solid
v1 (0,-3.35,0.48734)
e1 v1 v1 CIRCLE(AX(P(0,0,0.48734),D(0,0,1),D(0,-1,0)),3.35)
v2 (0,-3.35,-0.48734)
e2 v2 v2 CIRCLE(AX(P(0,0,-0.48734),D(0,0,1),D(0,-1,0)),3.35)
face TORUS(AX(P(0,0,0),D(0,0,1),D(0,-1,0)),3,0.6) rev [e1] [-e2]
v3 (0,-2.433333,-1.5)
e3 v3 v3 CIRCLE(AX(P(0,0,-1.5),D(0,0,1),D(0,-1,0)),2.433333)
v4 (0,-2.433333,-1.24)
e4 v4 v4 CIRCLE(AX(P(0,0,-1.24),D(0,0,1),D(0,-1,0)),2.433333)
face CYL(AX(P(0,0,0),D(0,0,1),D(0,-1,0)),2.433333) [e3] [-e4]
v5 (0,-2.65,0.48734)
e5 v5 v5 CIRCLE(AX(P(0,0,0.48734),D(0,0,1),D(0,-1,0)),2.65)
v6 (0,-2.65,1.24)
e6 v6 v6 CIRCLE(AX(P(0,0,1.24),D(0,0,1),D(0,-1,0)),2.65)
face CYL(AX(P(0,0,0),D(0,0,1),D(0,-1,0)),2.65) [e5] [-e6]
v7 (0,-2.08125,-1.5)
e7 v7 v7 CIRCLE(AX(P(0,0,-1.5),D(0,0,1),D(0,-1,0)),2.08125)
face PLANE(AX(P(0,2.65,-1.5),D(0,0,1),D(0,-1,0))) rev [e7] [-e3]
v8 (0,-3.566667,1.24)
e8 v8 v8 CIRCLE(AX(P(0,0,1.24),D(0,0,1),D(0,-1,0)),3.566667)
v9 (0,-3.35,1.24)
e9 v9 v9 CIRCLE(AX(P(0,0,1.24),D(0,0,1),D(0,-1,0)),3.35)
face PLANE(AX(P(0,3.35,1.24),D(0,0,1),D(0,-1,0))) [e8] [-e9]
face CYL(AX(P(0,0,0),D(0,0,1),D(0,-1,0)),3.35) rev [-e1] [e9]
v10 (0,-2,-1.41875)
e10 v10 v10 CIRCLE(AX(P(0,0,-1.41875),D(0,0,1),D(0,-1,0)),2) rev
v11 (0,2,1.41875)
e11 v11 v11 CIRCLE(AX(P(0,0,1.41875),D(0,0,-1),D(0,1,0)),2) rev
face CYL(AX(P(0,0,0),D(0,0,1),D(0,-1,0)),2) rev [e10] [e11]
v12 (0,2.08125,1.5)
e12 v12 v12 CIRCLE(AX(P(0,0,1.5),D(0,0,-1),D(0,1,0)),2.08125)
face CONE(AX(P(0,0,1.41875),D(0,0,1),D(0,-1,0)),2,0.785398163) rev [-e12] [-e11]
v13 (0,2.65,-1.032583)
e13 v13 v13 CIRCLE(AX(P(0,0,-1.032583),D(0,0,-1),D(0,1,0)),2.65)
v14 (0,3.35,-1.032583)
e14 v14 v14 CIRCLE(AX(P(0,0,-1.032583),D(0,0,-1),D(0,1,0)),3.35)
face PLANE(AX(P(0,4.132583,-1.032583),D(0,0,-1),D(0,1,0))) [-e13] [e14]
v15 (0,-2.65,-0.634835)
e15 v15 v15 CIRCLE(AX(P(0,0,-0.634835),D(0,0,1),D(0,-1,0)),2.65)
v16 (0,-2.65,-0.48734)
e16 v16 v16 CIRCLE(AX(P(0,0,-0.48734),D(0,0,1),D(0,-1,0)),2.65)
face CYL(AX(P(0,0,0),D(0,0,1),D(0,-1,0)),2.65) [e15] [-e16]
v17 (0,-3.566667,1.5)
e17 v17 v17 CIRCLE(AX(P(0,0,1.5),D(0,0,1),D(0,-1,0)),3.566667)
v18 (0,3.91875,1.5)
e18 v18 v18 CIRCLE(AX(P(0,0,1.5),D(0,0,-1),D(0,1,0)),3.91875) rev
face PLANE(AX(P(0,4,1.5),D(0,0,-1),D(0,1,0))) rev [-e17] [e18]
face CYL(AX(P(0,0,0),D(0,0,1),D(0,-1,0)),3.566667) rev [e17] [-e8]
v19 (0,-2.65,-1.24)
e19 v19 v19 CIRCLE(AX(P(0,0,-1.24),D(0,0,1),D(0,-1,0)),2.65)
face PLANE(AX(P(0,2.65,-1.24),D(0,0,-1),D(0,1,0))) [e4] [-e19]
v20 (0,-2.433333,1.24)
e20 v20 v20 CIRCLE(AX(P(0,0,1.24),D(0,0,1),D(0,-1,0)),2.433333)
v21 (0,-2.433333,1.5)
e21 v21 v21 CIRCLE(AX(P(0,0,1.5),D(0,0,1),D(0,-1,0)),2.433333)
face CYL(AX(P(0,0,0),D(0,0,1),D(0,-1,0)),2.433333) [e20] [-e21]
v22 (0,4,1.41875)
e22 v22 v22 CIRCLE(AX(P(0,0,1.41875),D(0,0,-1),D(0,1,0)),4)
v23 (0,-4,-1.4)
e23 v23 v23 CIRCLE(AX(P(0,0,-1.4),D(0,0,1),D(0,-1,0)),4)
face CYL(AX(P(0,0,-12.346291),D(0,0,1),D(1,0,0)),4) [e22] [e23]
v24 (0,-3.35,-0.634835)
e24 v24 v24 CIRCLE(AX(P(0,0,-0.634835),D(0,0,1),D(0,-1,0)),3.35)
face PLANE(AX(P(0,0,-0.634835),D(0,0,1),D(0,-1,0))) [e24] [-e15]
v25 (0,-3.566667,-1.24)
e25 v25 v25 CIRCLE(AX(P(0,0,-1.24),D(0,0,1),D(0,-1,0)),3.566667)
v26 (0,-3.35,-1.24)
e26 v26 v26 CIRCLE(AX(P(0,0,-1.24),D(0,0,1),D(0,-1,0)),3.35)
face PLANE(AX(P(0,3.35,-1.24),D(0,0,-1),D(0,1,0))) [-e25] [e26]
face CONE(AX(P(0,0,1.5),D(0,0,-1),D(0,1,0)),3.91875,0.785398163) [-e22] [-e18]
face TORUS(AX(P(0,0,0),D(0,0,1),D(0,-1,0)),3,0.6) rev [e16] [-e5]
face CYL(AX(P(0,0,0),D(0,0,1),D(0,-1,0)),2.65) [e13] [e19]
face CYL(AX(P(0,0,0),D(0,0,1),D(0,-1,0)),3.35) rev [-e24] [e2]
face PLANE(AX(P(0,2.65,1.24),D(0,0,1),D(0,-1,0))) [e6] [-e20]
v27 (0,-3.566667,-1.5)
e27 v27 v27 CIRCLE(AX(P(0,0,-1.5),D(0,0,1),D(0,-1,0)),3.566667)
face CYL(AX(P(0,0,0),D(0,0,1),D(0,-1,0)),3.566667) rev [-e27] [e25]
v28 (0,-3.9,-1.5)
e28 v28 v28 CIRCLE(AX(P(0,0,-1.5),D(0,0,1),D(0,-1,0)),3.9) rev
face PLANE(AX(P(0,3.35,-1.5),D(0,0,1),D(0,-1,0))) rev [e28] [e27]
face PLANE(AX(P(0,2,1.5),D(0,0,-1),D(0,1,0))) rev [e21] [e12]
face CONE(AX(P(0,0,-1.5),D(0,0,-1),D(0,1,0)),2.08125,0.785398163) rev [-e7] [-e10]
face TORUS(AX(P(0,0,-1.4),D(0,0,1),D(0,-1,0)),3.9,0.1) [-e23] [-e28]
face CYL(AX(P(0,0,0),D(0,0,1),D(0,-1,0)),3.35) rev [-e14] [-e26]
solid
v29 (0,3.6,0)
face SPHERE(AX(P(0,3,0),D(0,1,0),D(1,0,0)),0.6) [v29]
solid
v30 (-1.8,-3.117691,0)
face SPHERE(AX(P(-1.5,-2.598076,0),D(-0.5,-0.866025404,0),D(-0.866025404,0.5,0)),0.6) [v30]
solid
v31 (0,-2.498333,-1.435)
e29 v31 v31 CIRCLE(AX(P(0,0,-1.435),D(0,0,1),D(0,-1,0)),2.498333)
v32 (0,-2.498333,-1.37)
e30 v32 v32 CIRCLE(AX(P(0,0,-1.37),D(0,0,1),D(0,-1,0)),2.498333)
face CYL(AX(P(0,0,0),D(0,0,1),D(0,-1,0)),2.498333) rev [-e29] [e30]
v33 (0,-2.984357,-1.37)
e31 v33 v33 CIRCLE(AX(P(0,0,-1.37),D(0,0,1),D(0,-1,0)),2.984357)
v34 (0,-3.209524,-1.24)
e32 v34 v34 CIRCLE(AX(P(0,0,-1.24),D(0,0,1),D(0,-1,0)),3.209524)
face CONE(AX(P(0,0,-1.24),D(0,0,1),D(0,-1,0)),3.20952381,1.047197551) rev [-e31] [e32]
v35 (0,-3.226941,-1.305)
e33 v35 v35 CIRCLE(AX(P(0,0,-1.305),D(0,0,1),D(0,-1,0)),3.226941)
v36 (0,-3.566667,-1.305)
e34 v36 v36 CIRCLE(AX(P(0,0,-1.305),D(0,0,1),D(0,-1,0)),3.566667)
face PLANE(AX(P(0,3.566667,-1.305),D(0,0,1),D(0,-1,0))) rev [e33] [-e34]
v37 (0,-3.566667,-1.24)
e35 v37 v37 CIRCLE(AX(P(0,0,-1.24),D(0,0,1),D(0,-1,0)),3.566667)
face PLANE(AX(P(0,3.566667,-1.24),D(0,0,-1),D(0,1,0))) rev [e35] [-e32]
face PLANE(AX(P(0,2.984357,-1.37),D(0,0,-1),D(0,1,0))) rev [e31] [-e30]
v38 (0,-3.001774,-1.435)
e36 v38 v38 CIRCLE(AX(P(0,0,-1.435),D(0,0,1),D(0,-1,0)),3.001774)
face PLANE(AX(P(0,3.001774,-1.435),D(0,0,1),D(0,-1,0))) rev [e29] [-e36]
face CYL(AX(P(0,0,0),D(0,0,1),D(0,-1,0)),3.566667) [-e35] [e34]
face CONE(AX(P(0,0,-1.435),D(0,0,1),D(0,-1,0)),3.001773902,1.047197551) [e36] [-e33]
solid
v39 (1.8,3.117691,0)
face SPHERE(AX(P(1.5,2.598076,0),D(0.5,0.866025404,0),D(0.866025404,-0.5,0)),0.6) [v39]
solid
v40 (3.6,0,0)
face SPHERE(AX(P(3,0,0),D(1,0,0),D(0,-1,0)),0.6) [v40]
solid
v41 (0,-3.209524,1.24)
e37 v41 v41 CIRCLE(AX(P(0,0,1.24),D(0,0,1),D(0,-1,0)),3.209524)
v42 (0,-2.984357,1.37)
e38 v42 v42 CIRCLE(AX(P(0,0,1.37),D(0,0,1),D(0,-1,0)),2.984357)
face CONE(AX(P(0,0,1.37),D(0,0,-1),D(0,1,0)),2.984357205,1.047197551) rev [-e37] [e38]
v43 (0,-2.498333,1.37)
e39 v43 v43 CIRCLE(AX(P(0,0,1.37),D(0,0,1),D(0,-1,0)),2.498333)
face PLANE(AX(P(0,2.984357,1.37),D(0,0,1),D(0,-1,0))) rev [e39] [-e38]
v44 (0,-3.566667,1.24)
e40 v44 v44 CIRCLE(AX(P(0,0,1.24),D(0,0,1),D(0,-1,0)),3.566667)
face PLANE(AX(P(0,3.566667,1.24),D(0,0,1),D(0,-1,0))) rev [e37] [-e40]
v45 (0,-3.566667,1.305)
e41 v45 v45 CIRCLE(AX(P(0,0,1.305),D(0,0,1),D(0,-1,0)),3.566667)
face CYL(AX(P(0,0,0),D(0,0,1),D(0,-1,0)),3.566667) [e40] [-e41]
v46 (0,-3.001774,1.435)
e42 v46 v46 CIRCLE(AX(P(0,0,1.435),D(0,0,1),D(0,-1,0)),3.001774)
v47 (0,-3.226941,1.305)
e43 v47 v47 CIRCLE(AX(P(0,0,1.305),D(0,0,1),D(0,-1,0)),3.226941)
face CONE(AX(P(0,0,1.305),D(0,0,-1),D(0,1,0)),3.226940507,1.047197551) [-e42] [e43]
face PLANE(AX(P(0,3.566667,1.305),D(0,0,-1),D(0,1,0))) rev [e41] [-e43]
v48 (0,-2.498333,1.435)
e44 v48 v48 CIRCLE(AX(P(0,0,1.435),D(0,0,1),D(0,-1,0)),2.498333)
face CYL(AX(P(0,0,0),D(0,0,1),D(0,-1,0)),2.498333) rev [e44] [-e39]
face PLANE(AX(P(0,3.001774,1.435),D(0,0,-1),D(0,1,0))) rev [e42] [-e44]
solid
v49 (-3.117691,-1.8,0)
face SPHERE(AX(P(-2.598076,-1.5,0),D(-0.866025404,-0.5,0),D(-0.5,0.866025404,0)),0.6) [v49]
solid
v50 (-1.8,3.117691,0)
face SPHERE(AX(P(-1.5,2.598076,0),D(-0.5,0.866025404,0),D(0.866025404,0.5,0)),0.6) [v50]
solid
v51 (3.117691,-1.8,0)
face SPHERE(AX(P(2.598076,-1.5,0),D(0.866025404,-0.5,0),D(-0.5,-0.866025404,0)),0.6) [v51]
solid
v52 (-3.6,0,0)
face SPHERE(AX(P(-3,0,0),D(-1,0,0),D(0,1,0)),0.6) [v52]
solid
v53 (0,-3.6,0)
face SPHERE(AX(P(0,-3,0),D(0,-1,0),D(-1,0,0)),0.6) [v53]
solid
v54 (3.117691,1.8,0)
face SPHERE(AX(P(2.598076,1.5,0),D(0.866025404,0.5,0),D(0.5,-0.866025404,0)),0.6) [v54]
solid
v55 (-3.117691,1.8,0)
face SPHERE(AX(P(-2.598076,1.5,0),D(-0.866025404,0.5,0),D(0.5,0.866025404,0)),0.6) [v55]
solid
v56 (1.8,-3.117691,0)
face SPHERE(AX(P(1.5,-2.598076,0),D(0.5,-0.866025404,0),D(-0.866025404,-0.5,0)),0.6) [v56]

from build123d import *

# Parameters (mm, degrees)
FILLET1_SIZE            = 0.08125
FILLET2_SIZE            = 0.08125
CIRPATTERN3_COUNT       = 12
SKETCH8_W               = 0.26
SKETCH8_H               = 0.216666667
CUT_EXTRUDE1_DEPTH      = 8.163797875
CUT_EXTRUDE1_DEPTH_BACK = 8.163797875
SKETCH10_R              = 4.6
SKETCH10_R_2            = 4
BOSS_EXTRUDE1_START     = 0.397747564
SKETCH11_R              = 4
BOSS_EXTRUDE1_DEPTH     = 0.397747564
CUT_EXTRUDE2_DEPTH      = 7.046281526
CUT_EXTRUDE2_DEPTH_BACK = 7.046281526
SKETCH12_R              = 2
FILLET4_R               = 0.1


with BuildPart() as part:
    # Sketch2 → Revolve1 (revolve)
    with BuildSketch(Plane(origin=(0, 0, 0), x_dir=(0, 0, -1), z_dir=(1, 0, 0)), mode=Mode.PRIVATE) as revolve1_sk:
        with BuildLine():
            Line((1.5, 4.6), (0.9, 4.6))
            Line((0.9, 4.6), (0.9, 4.265165043))
            Line((0.9, 4.265165043), (1.032582521, 4.132582521))
            Line((1.032582521, 4.132582521), (1.032582521, 3.867417479))
            Line((1.032582521, 3.867417479), (0.767417479, 3.867417479))
            Line((0.767417479, 3.867417479), (0.634834957, 4))
            Line((0.634834957, 4), (-1.5, 4))
            Line((-1.5, 4), (-1.5, 3.35))
            Line((-1.5, 3.35), (-0.487339717, 3.35))
            ThreePointArc((-0.487339717, 3.35), (0, 3.6), (0.487339717, 3.35))
            Line((0.487339717, 3.35), (1.5, 3.35))
            Line((1.5, 3.35), (1.5, 4.6))
        make_face()
        with BuildLine():
            Line((1.5, 2), (-1.5, 2))
            Line((-1.5, 2), (-1.5, 2.65))
            Line((-1.5, 2.65), (-0.487339717, 2.65))
            ThreePointArc((-0.487339717, 2.65), (0, 2.4), (0.487339717, 2.65))
            Line((0.487339717, 2.65), (1.5, 2.65))
            Line((1.5, 2.65), (1.5, 2))
        make_face()
    revolve(revolve1_sk.sketch.rotate(Axis((0, 0, 0), (0, 0, -1)), 180), axis=Axis((0, 0, 0), (0, 0, -1)))

    # Fillet1
    fillet1_edges = [part.edges().sort_by_distance(p)[0] for p in [
        (0, 4, 1.5),
        (0, 4.6, -1.5),
        (0, 4.6, -0.9),
    ]]
    chamfer(fillet1_edges, length=FILLET1_SIZE)

    # Fillet2
    fillet2_edges = [part.edges().sort_by_distance(p)[0] for p in [
        (0, 2, -1.5),
        (0, 2, 1.5),
    ]]
    chamfer(fillet2_edges, length=FILLET2_SIZE)

    # Sketch8 → Cut-Revolve1 (revolve, cut)
    with BuildSketch(Plane(origin=(0, 0, 0), x_dir=(0, 0, -1), z_dir=(1, 0, 0)), mode=Mode.PRIVATE) as cut_revolve1_sk:
        with Locations((-1.37, 3.458333334)):
            Rectangle(SKETCH8_W, SKETCH8_H)
        with Locations((1.37, 3.458333334)):
            Rectangle(SKETCH8_W, SKETCH8_H)
        with Locations((1.37, 2.541666667)):
            Rectangle(SKETCH8_W, SKETCH8_H)
        with Locations((-1.37, 2.541666667)):
            Rectangle(SKETCH8_W, SKETCH8_H)
    revolve(cut_revolve1_sk.sketch.rotate(Axis((0, 0, 0), (0, 0, -1)), 180), axis=Axis((0, 0, 0), (0, 0, -1)), mode=Mode.SUBTRACT)

    # Sketch10 → Cut-Extrude1 (cut, two sides: drawn at the far end of the back side and taken through both)
    with BuildSketch(Plane.XY.offset(1.5).offset(-CUT_EXTRUDE1_DEPTH_BACK)):
        Circle(SKETCH10_R)
        with Locations(Location((0, 0, 0), (0, 0, 270))):
            Circle(SKETCH10_R_2, mode=Mode.SUBTRACT)
    extrude(amount=CUT_EXTRUDE1_DEPTH + CUT_EXTRUDE1_DEPTH_BACK, mode=Mode.SUBTRACT)

    # Sketch11 → Boss-Extrude1 (add)
    with BuildSketch(Plane.XY.offset(-1.032582521).offset(BOSS_EXTRUDE1_START)):
        Circle(SKETCH11_R)
    extrude(amount=-BOSS_EXTRUDE1_DEPTH)

    # Sketch12 → Cut-Extrude2 (cut, two sides: drawn at the far end of the back side and taken through both)
    with BuildSketch(Plane.XY.offset(-0.634834957).offset(-CUT_EXTRUDE2_DEPTH_BACK)):
        with Locations(Location((0, 0, 0), (0, 0, 270))):
            Circle(SKETCH12_R)
    extrude(amount=CUT_EXTRUDE2_DEPTH + CUT_EXTRUDE2_DEPTH_BACK, mode=Mode.SUBTRACT)

    # Fillet4
    # the kernel refuses this fillet: 0.1 mm, written as the material it takes off along each edge
    with BuildSketch(Plane(origin=(0, 0, -1.5), x_dir=(0, -1, 0), z_dir=(-1, 0, 0))) as fillet4_piece_1:
        with BuildLine():
            CenterArc((4 - FILLET4_R, FILLET4_R), FILLET4_R, 270, 90)
            Line((4 - FILLET4_R, 0), (4, 0))
            Line((4, 0), (4, FILLET4_R))
        make_face()
    revolve(axis=Axis((0, 0, -1.5), (0, 0, 1)), mode=Mode.SUBTRACT)


with BuildPart() as body_2:
    # Sketch7 → Revolve3 (revolve)
    with BuildSketch(Plane.XY):
        with BuildLine():
            Line((0, 3.6), (0, 2.4))
            ThreePointArc((0, 2.4), (-0.6, 3), (0, 3.6))
        make_face()
    revolve(axis=Axis((0, 3.6, 0), (0, -1, 0)))


with BuildPart() as cirpattern3_1:
    # CirPattern3: pattern copy
    add(body_2.part.rotate(Axis((0, 0, 0), (0, 0, 1)), 1 * 360 / CIRPATTERN3_COUNT))


with BuildPart() as cirpattern3_2:
    # CirPattern3: pattern copy
    add(body_2.part.rotate(Axis((0, 0, 0), (0, 0, 1)), 2 * 360 / CIRPATTERN3_COUNT))


with BuildPart() as cirpattern3_3:
    # CirPattern3: pattern copy
    add(body_2.part.rotate(Axis((0, 0, 0), (0, 0, 1)), 3 * 360 / CIRPATTERN3_COUNT))


with BuildPart() as cirpattern3_4:
    # CirPattern3: pattern copy
    add(body_2.part.rotate(Axis((0, 0, 0), (0, 0, 1)), 4 * 360 / CIRPATTERN3_COUNT))


with BuildPart() as cirpattern3_5:
    # CirPattern3: pattern copy
    add(body_2.part.rotate(Axis((0, 0, 0), (0, 0, 1)), 5 * 360 / CIRPATTERN3_COUNT))


with BuildPart() as cirpattern3_6:
    # CirPattern3: pattern copy
    add(body_2.part.rotate(Axis((0, 0, 0), (0, 0, 1)), 6 * 360 / CIRPATTERN3_COUNT))


with BuildPart() as cirpattern3_7:
    # CirPattern3: pattern copy
    add(body_2.part.rotate(Axis((0, 0, 0), (0, 0, 1)), 7 * 360 / CIRPATTERN3_COUNT))


with BuildPart() as cirpattern3_8:
    # CirPattern3: pattern copy
    add(body_2.part.rotate(Axis((0, 0, 0), (0, 0, 1)), 8 * 360 / CIRPATTERN3_COUNT))


with BuildPart() as cirpattern3_9:
    # CirPattern3: pattern copy
    add(body_2.part.rotate(Axis((0, 0, 0), (0, 0, 1)), 9 * 360 / CIRPATTERN3_COUNT))


with BuildPart() as cirpattern3_10:
    # CirPattern3: pattern copy
    add(body_2.part.rotate(Axis((0, 0, 0), (0, 0, 1)), 10 * 360 / CIRPATTERN3_COUNT))


with BuildPart() as cirpattern3_11:
    # CirPattern3: pattern copy
    add(body_2.part.rotate(Axis((0, 0, 0), (0, 0, 1)), 11 * 360 / CIRPATTERN3_COUNT))


with BuildPart() as body_14:
    # Sketch9 → Revolve4 (revolve)
    with BuildSketch(Plane(origin=(0, 0, 0), x_dir=(0, 0, -1), z_dir=(1, 0, 0)), mode=Mode.PRIVATE) as revolve4_sk:
        Polygon((-1.24, 3.566666667), (-1.24, 3.20952381), (-1.37, 2.984357205), (-1.37, 2.498333333), (-1.435, 2.498333333), (-1.435, 3.001773902), (-1.305, 3.226940507), (-1.305, 3.566666667), align=None)
        Polygon((1.24, 3.566666667), (1.24, 3.20952381), (1.37, 2.984357205), (1.37, 2.498333333), (1.435, 2.498333333), (1.435, 3.001773902), (1.305, 3.226940507), (1.305, 3.566666667), align=None)
    revolve(revolve4_sk.sketch.rotate(Axis((0, 0, 0), (0, 0, -1)), 180), axis=Axis((0, 0, 0), (0, 0, -1)))


solid = Compound([part.part, body_2.part, cirpattern3_1.part, cirpattern3_2.part, cirpattern3_3.part, cirpattern3_4.part, cirpattern3_5.part, cirpattern3_6.part, cirpattern3_7.part, cirpattern3_8.part, cirpattern3_9.part, cirpattern3_10.part, cirpattern3_11.part, body_14.part])
